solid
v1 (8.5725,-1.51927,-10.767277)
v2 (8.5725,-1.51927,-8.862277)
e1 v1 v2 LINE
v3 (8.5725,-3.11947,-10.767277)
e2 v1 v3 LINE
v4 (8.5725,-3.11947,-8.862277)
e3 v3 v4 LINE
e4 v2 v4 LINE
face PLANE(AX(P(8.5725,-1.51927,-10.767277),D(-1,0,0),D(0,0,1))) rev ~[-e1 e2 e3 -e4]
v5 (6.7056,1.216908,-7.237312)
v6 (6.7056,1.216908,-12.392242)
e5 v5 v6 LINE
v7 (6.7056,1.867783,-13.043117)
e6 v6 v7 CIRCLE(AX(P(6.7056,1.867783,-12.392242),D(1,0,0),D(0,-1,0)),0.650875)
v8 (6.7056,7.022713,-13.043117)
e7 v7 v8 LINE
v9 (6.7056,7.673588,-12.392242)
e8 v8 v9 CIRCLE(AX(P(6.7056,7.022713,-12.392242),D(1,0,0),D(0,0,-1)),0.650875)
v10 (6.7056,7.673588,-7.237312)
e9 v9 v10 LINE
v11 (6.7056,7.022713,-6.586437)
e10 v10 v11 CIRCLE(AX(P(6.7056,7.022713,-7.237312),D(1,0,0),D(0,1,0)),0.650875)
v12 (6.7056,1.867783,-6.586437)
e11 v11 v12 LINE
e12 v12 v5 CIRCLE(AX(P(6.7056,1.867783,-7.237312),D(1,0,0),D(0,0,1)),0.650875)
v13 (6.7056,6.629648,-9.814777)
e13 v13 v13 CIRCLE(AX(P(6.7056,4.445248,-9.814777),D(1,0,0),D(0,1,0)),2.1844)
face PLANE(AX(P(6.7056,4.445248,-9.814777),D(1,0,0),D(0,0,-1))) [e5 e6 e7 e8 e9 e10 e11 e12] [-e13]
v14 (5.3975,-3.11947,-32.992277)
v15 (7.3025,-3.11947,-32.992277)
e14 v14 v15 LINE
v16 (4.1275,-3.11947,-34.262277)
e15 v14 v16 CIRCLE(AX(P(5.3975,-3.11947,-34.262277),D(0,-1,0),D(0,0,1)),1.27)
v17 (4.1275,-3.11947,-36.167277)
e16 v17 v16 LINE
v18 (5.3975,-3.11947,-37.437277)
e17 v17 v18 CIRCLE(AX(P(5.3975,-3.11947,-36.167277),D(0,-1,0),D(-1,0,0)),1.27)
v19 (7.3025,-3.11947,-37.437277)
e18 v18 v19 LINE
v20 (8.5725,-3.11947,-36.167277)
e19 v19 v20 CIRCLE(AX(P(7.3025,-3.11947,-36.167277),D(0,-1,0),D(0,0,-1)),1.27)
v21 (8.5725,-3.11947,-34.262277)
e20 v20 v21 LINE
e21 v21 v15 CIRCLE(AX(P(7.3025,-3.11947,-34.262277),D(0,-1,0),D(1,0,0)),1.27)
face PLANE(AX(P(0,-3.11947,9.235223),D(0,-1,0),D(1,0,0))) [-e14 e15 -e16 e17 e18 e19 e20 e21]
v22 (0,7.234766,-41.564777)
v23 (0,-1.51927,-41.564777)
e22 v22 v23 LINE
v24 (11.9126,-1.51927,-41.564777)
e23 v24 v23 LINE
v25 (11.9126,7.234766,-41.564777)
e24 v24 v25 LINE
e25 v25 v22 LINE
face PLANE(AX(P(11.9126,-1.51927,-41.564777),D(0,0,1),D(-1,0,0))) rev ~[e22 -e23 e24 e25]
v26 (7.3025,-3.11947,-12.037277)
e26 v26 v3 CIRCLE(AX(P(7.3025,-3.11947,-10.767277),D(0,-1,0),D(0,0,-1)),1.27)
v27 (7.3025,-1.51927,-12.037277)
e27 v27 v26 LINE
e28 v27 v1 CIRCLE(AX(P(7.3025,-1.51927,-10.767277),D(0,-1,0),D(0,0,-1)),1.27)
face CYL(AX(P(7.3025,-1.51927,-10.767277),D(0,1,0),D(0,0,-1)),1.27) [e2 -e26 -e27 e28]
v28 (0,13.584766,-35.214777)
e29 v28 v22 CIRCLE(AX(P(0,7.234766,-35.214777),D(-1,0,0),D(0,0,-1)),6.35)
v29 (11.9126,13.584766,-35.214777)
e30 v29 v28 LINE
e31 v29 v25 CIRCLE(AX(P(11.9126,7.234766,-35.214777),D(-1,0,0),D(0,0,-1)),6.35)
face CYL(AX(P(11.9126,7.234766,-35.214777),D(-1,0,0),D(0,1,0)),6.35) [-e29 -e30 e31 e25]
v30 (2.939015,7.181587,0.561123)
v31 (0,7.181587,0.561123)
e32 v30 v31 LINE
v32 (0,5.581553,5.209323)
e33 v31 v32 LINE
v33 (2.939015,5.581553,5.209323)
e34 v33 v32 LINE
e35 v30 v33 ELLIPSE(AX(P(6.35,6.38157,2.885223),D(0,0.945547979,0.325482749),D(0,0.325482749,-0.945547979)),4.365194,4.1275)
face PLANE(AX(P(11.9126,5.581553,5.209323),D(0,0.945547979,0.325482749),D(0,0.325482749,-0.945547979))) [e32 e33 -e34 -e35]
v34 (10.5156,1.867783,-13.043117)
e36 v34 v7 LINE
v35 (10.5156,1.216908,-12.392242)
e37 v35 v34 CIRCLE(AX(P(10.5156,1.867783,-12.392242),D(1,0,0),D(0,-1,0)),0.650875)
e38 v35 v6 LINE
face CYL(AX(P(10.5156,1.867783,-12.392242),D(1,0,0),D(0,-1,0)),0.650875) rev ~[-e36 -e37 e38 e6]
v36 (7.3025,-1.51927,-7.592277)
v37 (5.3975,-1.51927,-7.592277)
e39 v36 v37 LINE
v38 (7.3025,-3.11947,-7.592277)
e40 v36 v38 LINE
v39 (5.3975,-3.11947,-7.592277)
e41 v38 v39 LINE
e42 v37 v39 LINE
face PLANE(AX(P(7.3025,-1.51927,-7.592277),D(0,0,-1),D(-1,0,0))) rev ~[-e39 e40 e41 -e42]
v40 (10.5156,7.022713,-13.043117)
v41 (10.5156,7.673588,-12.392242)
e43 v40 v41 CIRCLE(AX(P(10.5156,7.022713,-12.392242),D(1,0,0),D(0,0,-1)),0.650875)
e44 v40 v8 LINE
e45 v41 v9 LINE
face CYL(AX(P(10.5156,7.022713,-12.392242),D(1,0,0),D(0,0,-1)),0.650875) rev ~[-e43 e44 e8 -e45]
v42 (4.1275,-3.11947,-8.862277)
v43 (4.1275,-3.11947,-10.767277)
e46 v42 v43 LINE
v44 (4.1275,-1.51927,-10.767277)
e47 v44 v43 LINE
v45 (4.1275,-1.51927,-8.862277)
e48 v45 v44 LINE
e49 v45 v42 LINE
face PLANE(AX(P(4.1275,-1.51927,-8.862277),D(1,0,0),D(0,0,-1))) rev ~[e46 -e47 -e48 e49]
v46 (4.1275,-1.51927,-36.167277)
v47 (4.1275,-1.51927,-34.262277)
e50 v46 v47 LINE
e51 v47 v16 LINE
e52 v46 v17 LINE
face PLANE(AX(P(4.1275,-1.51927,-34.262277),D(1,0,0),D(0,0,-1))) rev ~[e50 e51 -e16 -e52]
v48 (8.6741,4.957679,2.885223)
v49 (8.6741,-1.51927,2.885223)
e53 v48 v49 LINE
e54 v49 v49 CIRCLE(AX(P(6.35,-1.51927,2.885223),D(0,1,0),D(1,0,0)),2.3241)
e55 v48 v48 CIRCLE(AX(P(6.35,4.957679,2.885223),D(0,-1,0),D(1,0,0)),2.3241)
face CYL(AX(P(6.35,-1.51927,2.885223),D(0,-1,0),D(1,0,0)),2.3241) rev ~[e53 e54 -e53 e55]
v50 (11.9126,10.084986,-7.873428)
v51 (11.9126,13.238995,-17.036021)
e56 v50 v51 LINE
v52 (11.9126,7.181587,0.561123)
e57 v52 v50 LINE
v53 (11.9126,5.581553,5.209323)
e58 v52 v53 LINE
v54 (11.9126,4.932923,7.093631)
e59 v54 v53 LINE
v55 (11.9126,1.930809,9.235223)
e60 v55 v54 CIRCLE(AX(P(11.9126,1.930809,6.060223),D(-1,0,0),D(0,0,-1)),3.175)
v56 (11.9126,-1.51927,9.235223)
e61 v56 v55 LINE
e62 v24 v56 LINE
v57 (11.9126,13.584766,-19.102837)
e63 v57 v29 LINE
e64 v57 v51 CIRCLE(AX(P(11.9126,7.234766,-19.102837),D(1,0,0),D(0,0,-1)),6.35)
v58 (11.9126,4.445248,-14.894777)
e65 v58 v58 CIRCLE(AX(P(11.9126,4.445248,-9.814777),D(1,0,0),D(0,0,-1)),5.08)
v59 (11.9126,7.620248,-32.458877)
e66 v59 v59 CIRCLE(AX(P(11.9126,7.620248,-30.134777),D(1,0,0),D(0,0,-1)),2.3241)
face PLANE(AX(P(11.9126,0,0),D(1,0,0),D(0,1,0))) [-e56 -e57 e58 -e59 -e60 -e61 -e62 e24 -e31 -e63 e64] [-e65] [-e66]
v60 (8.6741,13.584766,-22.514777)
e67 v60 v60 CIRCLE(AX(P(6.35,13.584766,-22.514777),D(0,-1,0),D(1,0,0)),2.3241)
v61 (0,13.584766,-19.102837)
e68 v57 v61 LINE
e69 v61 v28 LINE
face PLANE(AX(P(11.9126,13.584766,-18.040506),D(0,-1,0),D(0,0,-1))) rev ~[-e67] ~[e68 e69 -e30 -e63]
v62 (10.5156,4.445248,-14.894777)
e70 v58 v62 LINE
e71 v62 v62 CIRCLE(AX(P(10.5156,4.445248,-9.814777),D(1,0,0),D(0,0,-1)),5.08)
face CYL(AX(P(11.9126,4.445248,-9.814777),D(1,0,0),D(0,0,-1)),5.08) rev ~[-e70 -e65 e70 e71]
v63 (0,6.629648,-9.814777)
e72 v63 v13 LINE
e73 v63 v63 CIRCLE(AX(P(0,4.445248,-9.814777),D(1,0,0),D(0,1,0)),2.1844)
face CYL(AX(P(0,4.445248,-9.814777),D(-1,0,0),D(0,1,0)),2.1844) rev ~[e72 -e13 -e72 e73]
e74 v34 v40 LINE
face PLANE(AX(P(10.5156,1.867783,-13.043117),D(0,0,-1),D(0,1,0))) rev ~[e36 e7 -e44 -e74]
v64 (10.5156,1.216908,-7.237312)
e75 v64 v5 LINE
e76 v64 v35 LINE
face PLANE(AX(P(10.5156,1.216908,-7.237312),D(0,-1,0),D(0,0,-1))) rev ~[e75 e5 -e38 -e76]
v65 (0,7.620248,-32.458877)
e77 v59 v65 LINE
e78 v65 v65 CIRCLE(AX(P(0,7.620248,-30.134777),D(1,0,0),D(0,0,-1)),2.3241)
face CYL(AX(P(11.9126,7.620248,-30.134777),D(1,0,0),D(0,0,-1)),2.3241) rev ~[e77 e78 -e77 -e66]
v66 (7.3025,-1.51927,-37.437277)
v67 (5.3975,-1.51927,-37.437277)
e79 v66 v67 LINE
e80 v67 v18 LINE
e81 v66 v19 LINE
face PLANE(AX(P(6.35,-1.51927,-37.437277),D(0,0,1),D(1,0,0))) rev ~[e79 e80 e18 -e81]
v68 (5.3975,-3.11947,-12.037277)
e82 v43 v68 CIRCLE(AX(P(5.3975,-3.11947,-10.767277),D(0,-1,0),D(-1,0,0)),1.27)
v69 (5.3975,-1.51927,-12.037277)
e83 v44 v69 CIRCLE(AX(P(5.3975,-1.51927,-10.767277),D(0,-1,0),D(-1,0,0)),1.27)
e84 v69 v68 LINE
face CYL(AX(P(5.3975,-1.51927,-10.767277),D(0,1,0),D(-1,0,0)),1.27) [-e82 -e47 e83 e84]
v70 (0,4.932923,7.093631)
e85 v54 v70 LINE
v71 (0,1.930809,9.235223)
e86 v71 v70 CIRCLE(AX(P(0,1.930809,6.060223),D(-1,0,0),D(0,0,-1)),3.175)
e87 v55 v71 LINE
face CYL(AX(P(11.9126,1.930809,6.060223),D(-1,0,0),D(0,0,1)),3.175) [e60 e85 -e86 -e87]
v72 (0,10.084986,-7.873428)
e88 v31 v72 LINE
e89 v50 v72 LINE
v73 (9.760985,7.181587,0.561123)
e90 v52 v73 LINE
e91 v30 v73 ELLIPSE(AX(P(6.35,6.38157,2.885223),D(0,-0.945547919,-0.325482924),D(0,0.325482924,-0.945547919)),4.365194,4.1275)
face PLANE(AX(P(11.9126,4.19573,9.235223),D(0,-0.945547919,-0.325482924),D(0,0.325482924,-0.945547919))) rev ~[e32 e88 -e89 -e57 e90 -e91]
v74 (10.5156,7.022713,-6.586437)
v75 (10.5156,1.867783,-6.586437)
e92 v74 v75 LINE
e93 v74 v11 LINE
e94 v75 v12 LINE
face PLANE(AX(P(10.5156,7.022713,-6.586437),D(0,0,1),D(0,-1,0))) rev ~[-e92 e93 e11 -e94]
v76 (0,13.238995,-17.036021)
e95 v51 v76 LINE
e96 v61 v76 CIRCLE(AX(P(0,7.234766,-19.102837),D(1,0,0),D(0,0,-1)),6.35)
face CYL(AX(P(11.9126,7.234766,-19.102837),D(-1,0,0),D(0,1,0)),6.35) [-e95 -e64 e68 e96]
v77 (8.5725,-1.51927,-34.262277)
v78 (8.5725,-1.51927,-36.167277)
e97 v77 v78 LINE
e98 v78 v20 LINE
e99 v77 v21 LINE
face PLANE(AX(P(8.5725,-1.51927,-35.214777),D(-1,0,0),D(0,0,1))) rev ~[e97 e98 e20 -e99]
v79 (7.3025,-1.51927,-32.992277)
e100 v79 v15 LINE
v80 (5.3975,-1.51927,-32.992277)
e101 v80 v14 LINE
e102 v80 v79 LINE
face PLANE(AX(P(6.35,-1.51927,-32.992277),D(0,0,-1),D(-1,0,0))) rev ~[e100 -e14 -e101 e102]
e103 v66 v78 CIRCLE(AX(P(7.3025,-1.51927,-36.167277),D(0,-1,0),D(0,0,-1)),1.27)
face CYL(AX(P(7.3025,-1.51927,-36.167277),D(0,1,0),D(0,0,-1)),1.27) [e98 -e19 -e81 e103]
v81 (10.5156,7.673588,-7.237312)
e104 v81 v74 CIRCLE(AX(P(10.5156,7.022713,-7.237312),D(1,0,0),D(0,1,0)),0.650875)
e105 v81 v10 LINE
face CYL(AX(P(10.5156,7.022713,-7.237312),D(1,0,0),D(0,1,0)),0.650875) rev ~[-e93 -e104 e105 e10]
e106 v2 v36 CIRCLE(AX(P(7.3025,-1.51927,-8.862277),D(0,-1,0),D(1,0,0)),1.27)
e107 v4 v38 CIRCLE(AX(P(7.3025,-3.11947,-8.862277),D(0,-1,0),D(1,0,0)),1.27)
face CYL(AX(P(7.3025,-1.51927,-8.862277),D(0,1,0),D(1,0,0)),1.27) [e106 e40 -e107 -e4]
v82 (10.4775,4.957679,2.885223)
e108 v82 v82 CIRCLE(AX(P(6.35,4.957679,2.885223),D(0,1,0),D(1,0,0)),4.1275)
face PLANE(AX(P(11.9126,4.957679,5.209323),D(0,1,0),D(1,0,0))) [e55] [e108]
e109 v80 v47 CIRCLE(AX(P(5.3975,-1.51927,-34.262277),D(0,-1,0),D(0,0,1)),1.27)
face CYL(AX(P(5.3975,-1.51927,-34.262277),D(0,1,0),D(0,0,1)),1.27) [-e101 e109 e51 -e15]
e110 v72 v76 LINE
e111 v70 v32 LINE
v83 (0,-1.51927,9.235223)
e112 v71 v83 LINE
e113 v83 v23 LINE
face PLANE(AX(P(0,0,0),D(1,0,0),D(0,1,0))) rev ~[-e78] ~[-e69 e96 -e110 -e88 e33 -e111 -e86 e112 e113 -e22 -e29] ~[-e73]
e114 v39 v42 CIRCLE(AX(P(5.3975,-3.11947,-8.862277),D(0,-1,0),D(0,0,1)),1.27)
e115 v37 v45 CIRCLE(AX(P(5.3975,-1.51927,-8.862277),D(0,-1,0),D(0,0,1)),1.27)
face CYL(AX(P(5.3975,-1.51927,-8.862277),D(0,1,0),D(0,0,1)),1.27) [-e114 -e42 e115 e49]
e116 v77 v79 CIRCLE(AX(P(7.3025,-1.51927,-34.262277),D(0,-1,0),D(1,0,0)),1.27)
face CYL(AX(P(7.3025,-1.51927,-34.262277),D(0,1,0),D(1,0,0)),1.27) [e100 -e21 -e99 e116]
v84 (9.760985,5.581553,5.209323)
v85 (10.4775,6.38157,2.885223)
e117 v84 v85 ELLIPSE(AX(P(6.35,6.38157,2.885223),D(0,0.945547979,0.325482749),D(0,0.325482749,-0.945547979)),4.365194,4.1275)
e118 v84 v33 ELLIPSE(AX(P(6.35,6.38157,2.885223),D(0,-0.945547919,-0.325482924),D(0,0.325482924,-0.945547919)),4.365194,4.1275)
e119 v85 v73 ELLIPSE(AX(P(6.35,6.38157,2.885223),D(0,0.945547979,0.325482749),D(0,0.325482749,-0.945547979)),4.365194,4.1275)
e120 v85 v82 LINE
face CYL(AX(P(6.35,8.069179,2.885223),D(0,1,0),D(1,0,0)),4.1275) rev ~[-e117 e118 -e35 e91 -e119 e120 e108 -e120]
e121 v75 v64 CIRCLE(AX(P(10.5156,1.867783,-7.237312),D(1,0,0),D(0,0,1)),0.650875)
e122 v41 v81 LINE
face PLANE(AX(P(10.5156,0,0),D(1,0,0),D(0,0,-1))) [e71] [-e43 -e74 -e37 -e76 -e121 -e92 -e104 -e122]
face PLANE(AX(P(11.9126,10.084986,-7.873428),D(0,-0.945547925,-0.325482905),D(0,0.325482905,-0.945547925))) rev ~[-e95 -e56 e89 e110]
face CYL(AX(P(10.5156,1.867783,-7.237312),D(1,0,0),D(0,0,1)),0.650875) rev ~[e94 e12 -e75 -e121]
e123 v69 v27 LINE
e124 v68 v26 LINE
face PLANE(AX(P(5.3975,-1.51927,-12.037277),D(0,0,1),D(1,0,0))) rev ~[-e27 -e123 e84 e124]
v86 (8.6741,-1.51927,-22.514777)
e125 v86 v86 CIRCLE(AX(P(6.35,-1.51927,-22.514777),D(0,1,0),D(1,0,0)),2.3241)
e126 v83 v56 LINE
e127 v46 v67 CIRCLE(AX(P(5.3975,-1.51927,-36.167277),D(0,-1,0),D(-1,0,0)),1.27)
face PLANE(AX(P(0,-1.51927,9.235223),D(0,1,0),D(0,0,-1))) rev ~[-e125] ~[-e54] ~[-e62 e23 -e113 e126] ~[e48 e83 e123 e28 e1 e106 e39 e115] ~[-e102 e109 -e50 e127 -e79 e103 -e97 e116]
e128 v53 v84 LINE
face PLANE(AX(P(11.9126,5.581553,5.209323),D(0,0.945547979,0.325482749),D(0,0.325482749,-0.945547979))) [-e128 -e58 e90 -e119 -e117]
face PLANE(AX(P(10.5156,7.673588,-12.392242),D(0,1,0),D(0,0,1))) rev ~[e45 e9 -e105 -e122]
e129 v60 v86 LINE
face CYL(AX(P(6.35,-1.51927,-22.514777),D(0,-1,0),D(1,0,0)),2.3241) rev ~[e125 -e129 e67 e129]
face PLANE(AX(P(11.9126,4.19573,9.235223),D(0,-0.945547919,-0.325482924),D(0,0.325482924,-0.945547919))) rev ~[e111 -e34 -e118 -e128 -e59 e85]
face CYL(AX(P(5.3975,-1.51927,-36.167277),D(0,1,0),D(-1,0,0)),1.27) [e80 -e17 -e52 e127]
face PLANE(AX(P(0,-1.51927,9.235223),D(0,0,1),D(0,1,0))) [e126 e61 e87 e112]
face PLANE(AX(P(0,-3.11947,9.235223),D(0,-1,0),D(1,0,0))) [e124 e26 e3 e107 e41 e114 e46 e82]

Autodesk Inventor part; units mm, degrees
ref_plane "YZ Plane" through (0, 0, 0) normal (1, 0, 0) x (0, 1, 0)
ref_plane "XZ Plane" through (0, 0, 0) normal (0, 1, 0) x (-1, 0, 0)
ref_plane "XY Plane" through (0, 0, 0) normal (0, 0, 1) x (1, 0, 0)
sketch "Sketch1" plane through (0, 0, 0) normal (1, 0, 0) x (0, 1, 0)
  line L0 (-1.51927, 9.235223) -> (-1.51927, -28.864777)
  circle A0 centre (4.445248, -9.814777) radius 2.1844
  circle A1 centre (4.445248, -9.814777) radius 5.964518
  line L1 (4.445248, -9.814777) -> (-1.51927, -9.814777)
  line L2 (-1.51927, -9.814777) -> (-1.51927, 9.235223)
  line L3 (-1.51927, 9.235223) -> (-1.51927, -28.864777)
  line L4 (-1.51927, 9.235223) -> (1.02073, 9.235223)
  line L5 (1.02073, 9.235223) -> (9.344761, -6.41327)
  line L6 (-1.51927, -28.864777) -> (1.02073, -28.864777)
  line L7 (1.02073, -28.864777) -> (9.344761, -13.216284)
  point P0 (0, 0)
  dimension "d0" = 5.96452
  dimension "d1" = 19.05
  dimension "d2" = 38.1
  dimension "d3" = 2.54
extrude "Extrusion1" add sketch "Sketch1" along normal blind 11.9126
sketch "Sketch2" plane through (0, -1.51927, -28.864777) normal (0, -1, 0) x (1, 0, 0)
  line L0 (0, 38.1) -> (0, 0) projected
  line L1 (0, 0) -> (11.9126, 0) projected
  line L2 (11.9126, 38.1) -> (11.9126, 0) projected
  line L3 (0, 38.1) -> (11.9126, 38.1) projected
  line L4 (0, 38.1) -> (6.35, 38.1)
  line L5 (6.35, 38.1) -> (6.35, 0)
  line L6 (6.35, 38.1) -> (6.35, 31.75)
  line L7 (6.35, 31.75) -> (6.35, 6.35)
  line L8 (6.35, 6.35) -> (6.35, 0)
  circle A0 centre (6.35, 31.75) radius 2.3241
  circle A1 centre (6.35, 6.35) radius 2.3241
  circle A2 centre (6.35, 19.05) radius 2.2225
  point P0 (0, 28.864777)
  dimension "d6" = 6.35
  dimension "d7" = 6.35
  dimension "d8" = 25.4
  dimension "d9" = 4.6482
  dimension "d10" = 4.445
extrude "Extrusion2" cut sketch "Sketch2" against normal through all contours A0 L5 | L5 A0 | A1 L5 | L5 A1
sketch "Sketch3" plane through (11.9126, 0, 0) normal (1, 0, 0) x (0, 0, -1)
  line L0 (28.864777, -1.51927) -> (28.864777, 1.02073)
  line L1 (28.864777, 1.02073) -> (13.216284, 9.344761)
  arc A0 (13.216284, 9.344761) -> (6.41327, 9.344761) centre (9.814777, 4.445248) ccw
  line L2 (6.41327, 9.344761) -> (-9.235223, 1.02073)
  line L3 (-9.235223, 1.02073) -> (-9.235223, -1.51927)
  line L4 (-9.235223, -1.51927) -> (28.864777, -1.51927)
  circle A1 centre (9.814777, 4.445248) radius 2.1844
  line L5 (9.814777, 10.409766) -> (28.864777, 10.409766)
  line L6 (28.864777, 10.409766) -> (28.864777, -1.51927)
  line L7 (20.190677, 5.634815) -> (24.838877, 3.16226)
  line L8 (24.838877, -1.51927) -> (20.190677, -1.51927)
  line L9 (22.514777, -1.51927) -> (22.514777, 10.409766)
  line L10 (22.514777, 10.409766) -> (35.214777, 10.409766)
  line L11 (35.214777, 10.409766) -> (35.214777, -1.51927)
  line L12 (35.214777, -1.51927) -> (28.864777, -1.51927)
  line L13 (-9.235223, 1.02073) -> (-9.235223, 4.19573)
  line L14 (-9.235223, 4.19573) -> (7.873428, 10.084986)
  point P0 (0, 0)
  dimension "d13" = 12.7
  dimension "d14" = 3.175
extrude "Extrusion3" add sketch "Sketch3" against normal up to surface (11.9126 mm away) contours L0 L6 L10 L11 L12 | L1 L9 L5 L6 | L1 A0 L5 L9 | A0 L2 L13 L14
sketch "Sketch4" plane through (0, -1.51927, 9.235223) normal (0, -1, 0) x (1, 0, 0)
  circle A0 centre (6.35, -31.75) radius 2.3241 projected
  circle A1 centre (6.35, -6.35) radius 2.3241 projected
  line L0 (0, 0) -> (0, -44.45) projected
  line L1 (11.9126, -44.45) -> (0, -44.45) projected
  line L2 (11.9126, 0) -> (11.9126, -44.45) projected
  line L3 (0, 0) -> (11.9126, 0) projected
  point P0 (0, -9.235223)
extrude "Extrusion4" cut sketch "Sketch4" against normal through all contours A0 | A1
sketch "Sketch6" plane through (0, -1.51927, 9.235223) normal (0, -1, 0) x (1, 0, 0)
  line L0 (11.9126, -16.8656) -> (0, -16.8656) projected
  circle A0 centre (6.35, -31.75) radius 2.3241 projected
  circle A1 centre (6.35, -6.35) radius 2.3241 projected
  line L1 (0, 0) -> (0, -44.45) projected
  line L2 (11.9126, -44.45) -> (0, -44.45) projected
  line L3 (11.9126, 0) -> (11.9126, -44.45) projected
  line L4 (0, 0) -> (11.9126, 0) projected
  line L5 (6.35, -6.35) -> (6.35, -19.05)
  circle A2 centre (6.35, -19.05) radius 2.2225
  line L6 (7.3025, -16.8275) -> (5.3975, -16.8275)
  line L7 (4.1275, -18.0975) -> (4.1275, -20.0025)
  line L8 (5.3975, -21.2725) -> (7.3025, -21.2725)
  line L9 (8.5725, -20.0025) -> (8.5725, -18.0975)
  arc A3 (8.5725, -18.0975) -> (7.3025, -16.8275) centre (7.3025, -18.0975) ccw
  arc A4 (7.3025, -21.2725) -> (8.5725, -20.0025) centre (7.3025, -20.0025) ccw
  arc A5 (5.3975, -16.8275) -> (4.1275, -18.0975) centre (5.3975, -18.0975) ccw
  arc A6 (4.1275, -20.0025) -> (5.3975, -21.2725) centre (5.3975, -20.0025) ccw
  point P0 (0, -9.235223)
  dimension "d20" = 12.7
  dimension "d21" = 4.445
  dimension "d22" = 1.27
sketch "Sketch6 outline for Extrusion5" plane through (0, -1.51927, 9.235223) normal (0, -1, 0) x (1, 0, 0)
  arc A0 (4.1275, -20.0025) -> (5.3975, -21.2725) centre (5.3975, -20.0025) ccw
  line L0 (4.1275, -18.0975) -> (4.1275, -20.0025)
  arc A1 (5.3975, -16.8275) -> (4.1275, -18.0975) centre (5.3975, -18.0975) ccw
  line L1 (7.3025, -16.8275) -> (5.3975, -16.8275)
  arc A2 (8.5725, -18.0975) -> (7.3025, -16.8275) centre (7.3025, -18.0975) ccw
  line L2 (8.5725, -20.0025) -> (8.5725, -18.0975)
  arc A3 (7.3025, -21.2725) -> (8.5725, -20.0025) centre (7.3025, -20.0025) ccw
  line L3 (5.3975, -21.2725) -> (7.3025, -21.2725)
extrude "Extrusion5" add sketch "Sketch6 outline for Extrusion5" along normal blind 1.6002
sketch "Sketch7" plane through (0, -1.51927, 9.235223) normal (0, -1, 0) x (1, 0, 0)
  arc A0 (4.1275, -20.0025) -> (5.3975, -21.2725) centre (5.3975, -20.0025) ccw projected
  line L0 (4.1275, -20.0025) -> (4.1275, -18.0975) projected
  arc A1 (5.3975, -16.8275) -> (4.1275, -18.0975) centre (5.3975, -18.0975) ccw projected
  line L1 (5.3975, -16.8275) -> (7.3025, -16.8275) projected
  arc A2 (8.5725, -18.0975) -> (7.3025, -16.8275) centre (7.3025, -18.0975) ccw projected
  line L2 (8.5725, -18.0975) -> (8.5725, -20.0025) projected
  arc A3 (7.3025, -21.2725) -> (8.5725, -20.0025) centre (7.3025, -20.0025) ccw projected
  line L3 (7.3025, -21.2725) -> (5.3975, -21.2725) projected
  circle A4 centre (6.35, -31.75) radius 2.3241 projected
  circle A5 centre (6.35, -6.35) radius 2.3241 projected
  line L4 (0, 0) -> (0, -44.45) projected
  line L5 (11.9126, -44.45) -> (0, -44.45) projected
  line L6 (11.9126, 0) -> (11.9126, -44.45) projected
  line L7 (0, 0) -> (11.9126, 0) projected
  line L8 (11.9126, -44.45) -> (11.9126, -50.8)
  line L9 (11.9126, 0) -> (11.9126, -44.45) projected
  line L10 (11.9126, -50.8) -> (0, -50.8)
  line L11 (0, -50.8) -> (0, -44.45)
  line L12 (6.35, -31.75) -> (6.35, -44.45)
  circle A6 centre (6.35, -44.45) radius 2.2225
  line L13 (7.3025, -42.2275) -> (5.3975, -42.2275)
  line L14 (4.1275, -43.4975) -> (4.1275, -45.4025)
  line L15 (5.3975, -46.6725) -> (7.3025, -46.6725)
  line L16 (8.5725, -45.4025) -> (8.5725, -43.4975)
  arc A7 (8.5725, -43.4975) -> (7.3025, -42.2275) centre (7.3025, -43.4975) ccw
  arc A8 (7.3025, -46.6725) -> (8.5725, -45.4025) centre (7.3025, -45.4025) ccw
  arc A9 (4.1275, -45.4025) -> (5.3975, -46.6725) centre (5.3975, -45.4025) ccw
  arc A10 (5.3975, -42.2275) -> (4.1275, -43.4975) centre (5.3975, -43.4975) ccw
  point P0 (0, -9.235223)
  dimension "d25" = 6.35
  dimension "d26" = 12.7
  dimension "d27" = 4.445
  dimension "d28" = 1.27
extrude "Extrusion6" add sketch "Sketch7" against normal up to surface (11.929036 mm away) contours L5 L14 A9 L15 A8 L16 L8 L10 L11 | L5 A6 | A6 L15 A9 L14 | A6 L16 A8 L15
extrude "Extrusion7" add sketch "Sketch7" along normal blind 1.6002 contours A6 L12 L5 | L14 A10 L13 A6 | L5 A6 | A6 L15 A9 L14 | L12 A6 L5 | L13 A7 L16 A6 | A6 L16 A8 L15
sketch "Sketch8" plane through (11.9126, 0, 0) normal (1, 0, 0) x (0, 0, -1)
  line L0 (24.838877, -1.51927) -> (24.838877, 10.409766)
  arc A0 (9.814777, 10.409766) -> (7.873428, 10.084986) centre (9.814777, 4.445248) ccw
  line L1 (7.873428, 10.084986) -> (-9.235223, 4.19573)
  line L2 (-9.235223, 4.19573) -> (-9.235223, -1.51927)
  line L3 (-9.235223, -1.51927) -> (41.564777, -1.51927)
  line L4 (41.564777, -1.51927) -> (41.564777, 10.409766)
  line L5 (41.564777, 10.409766) -> (9.814777, 10.409766)
  circle A1 centre (9.814777, 4.445248) radius 2.1844
  line L6 (-9.235223, 4.19573) -> (18.040506, 13.584766)
  line L7 (14.316656, 13.584766) -> (41.564777, 13.584766)
  line L8 (41.564777, 13.584766) -> (41.564777, 10.409766)
  point P0 (0, 0)
  point P1 (7.873428, 10.084986)
extrude "Extrusion8" add sketch "Sketch8" against normal up to surface (11.9126 mm away) contours L5 A0 L6 L7 L8
sketch "Sketch9" plane through (11.9126, 0, 0) normal (1, 0, 0) x (0, 0, -1)
  line L0 (18.040506, 13.584766) -> (-9.235223, 4.19573)
  line L1 (-9.235223, 4.19573) -> (-9.235223, -1.51927)
  line L2 (-9.235223, -1.51927) -> (41.564777, -1.51927)
  line L3 (41.564777, -1.51927) -> (41.564777, 13.584766)
  line L4 (41.564777, 13.584766) -> (18.040506, 13.584766)
  circle A0 centre (9.814777, 4.445248) radius 2.1844
  line L5 (9.814777, 4.445248) -> (35.214777, 4.445248)
  line L6 (35.214777, 4.445248) -> (35.214777, 7.620248)
  circle A1 centre (35.214777, 7.620248) radius 2.3241
  circle A2 centre (35.214777, 7.620248) radius 5.08
  line L7 (35.214777, 7.620248) -> (30.134777, 7.620248)
  circle A3 centre (30.134777, 7.620248) radius 2.3241
  point P0 (0, 0)
  dimension "d36" = 25.4
  dimension "d37" = 3.175
  dimension "d38" = 4.6482
  dimension "d49" = 10.16
  dimension "d57" = 5.08
  dimension "d58" = 4.6482
fillet "Fillet1" radius 3.175 1 edges at (5.9563, 4.1957, 9.2352)
sketch "Sketch10" plane through (11.9126, 0, 0) normal (1, 0, 0) x (0, 0, -1)
  line L0 (-5.209323, 5.581553) -> (-0.561123, 7.181587)
  line L1 (-0.561123, -1.51927) -> (-5.209323, -1.51927)
  line L2 (-2.885223, 6.38157) -> (-0.561123, 6.38157)
  line L3 (-0.561123, -1.51927) -> (-0.561123, 7.181587)
  line L4 (-0.561123, 6.38157) -> (-5.209323, 6.38157)
  line L5 (-5.209323, -1.51927) -> (-5.209323, 5.581553)
  line L6 (-0.561123, 6.38157) -> (-0.561123, 8.069179)
  line L7 (-0.561123, 8.069179) -> (-5.209323, 8.069179)
  line L8 (-5.209323, 8.069179) -> (-5.209323, 5.581553)
  point P0 (0, 0)
extrude "Extrusion9" add sketch "Sketch10" against normal up to surface (11.9126 mm away) contours L8 L4 L0 | L4 L8 L7 L6 L0
sketch "Sketch11" plane through (11.9126, 8.069179, 5.209323) normal (0, 1, 0) x (1, 0, 0)
  arc A0 (-5.5626, 4.6482) -> (-5.5626, 0) centre (-5.5626, 2.3241) ccw projected
  arc A1 (-5.5626, 0) -> (-5.5626, 4.6482) centre (-5.5626, 2.3241) ccw projected
  circle A2 centre (-5.5626, 2.3241) radius 2.3241 projected
  arc A3 (-5.5626, 4.6482) -> (-5.5626, 0) centre (-5.5626, 2.3241) ccw projected
  circle A4 centre (-5.5626, 2.3241) radius 4.1275
  point P0 (-11.9126, 5.209323)
  dimension "d42" = 8.255
extrude "Extrusion10" cut sketch "Sketch11" against normal blind 3.1115 contours A1 A0 | A4
sketch "Sketch12" plane through (11.9126, 0, 0) normal (1, 0, 0) x (0, 0, -1)
  circle A0 centre (9.814777, 4.445248) radius 2.1844
  arc A1 (-7.093632, 4.932923) -> (-9.235223, 1.930809) centre (-6.060223, 1.930809) ccw
  line L0 (-9.235223, 1.930809) -> (-9.235223, -1.51927)
  line L1 (-9.235223, -1.51927) -> (41.564777, -1.51927)
  line L2 (41.564777, -1.51927) -> (41.564777, 13.584766)
  line L3 (41.564777, 13.584766) -> (18.040506, 13.584766)
  line L4 (18.040506, 13.584766) -> (-0.561123, 7.181587)
  line L5 (-0.561123, 7.181587) -> (-0.561123, 8.069179)
  line L6 (-0.561123, 8.069179) -> (-5.209323, 8.069179)
  line L7 (-5.209323, 8.069179) -> (-5.209323, 5.581553)
  line L8 (-5.209323, 5.581553) -> (-7.093632, 4.932923)
  line L9 (-5.209323, 5.581553) -> (-0.561123, 7.181587)
  point P0 (0, 0)
extrude "Extrusion11" cut sketch "Sketch12" along normal through all both and the other way through all contours L7 L6 L5 L9
sketch "Sketch13" plane through (0, -1.51927, 9.235223) normal (0, -1, 0) x (1, 0, 0)
  circle A0 centre (6.35, -6.35) radius 4.1275 projected
  arc A1 (5.3975, -42.2275) -> (4.1275, -43.4975) centre (5.3975, -43.4975) ccw projected
  line L0 (5.3975, -42.2275) -> (7.3025, -42.2275) projected
  arc A2 (8.5725, -43.4975) -> (7.3025, -42.2275) centre (7.3025, -43.4975) ccw projected
  line L1 (8.5725, -43.4975) -> (8.5725, -45.4025) projected
  arc A3 (7.3025, -46.6725) -> (8.5725, -45.4025) centre (7.3025, -45.4025) ccw projected
  line L2 (7.3025, -46.6725) -> (5.3975, -46.6725) projected
  arc A4 (4.1275, -45.4025) -> (5.3975, -46.6725) centre (5.3975, -45.4025) ccw projected
  line L3 (4.1275, -45.4025) -> (4.1275, -43.4975) projected
  arc A5 (4.1275, -20.0025) -> (5.3975, -21.2725) centre (5.3975, -20.0025) ccw projected
  line L4 (4.1275, -20.0025) -> (4.1275, -18.0975) projected
  arc A6 (5.3975, -16.8275) -> (4.1275, -18.0975) centre (5.3975, -18.0975) ccw projected
  line L5 (5.3975, -16.8275) -> (7.3025, -16.8275) projected
  arc A7 (8.5725, -18.0975) -> (7.3025, -16.8275) centre (7.3025, -18.0975) ccw projected
  line L6 (8.5725, -18.0975) -> (8.5725, -20.0025) projected
  arc A8 (7.3025, -21.2725) -> (8.5725, -20.0025) centre (7.3025, -20.0025) ccw projected
  line L7 (7.3025, -21.2725) -> (5.3975, -21.2725) projected
  circle A9 centre (6.35, -31.75) radius 2.3241 projected
  circle A10 centre (6.35, -6.35) radius 2.3241 projected
  line L8 (0, 0) -> (0, -50.8) projected
  line L9 (0, -50.8) -> (11.9126, -50.8) projected
  line L10 (11.9126, 0) -> (11.9126, -50.8) projected
  line L11 (0, 0) -> (11.9126, 0) projected
  point P0 (0, -9.235223)
extrude "Extrusion12" cut sketch "Sketch13" along normal through all both and the other way through all contours A9
extrude "Extrusion13" [suppressed]
sketch "Sketch14" plane through (11.9126, 0, 0) normal (1, 0, 0) x (0, 0, -1)
  line L0 (18.040506, 13.584766) -> (-7.093632, 4.932923)
  arc A0 (-7.093632, 4.932923) -> (-9.235223, 1.930809) centre (-6.060223, 1.930809) ccw
  line L1 (-9.235223, 1.930809) -> (-9.235223, -1.51927)
  line L2 (-9.235223, -1.51927) -> (41.564777, -1.51927)
  line L3 (41.564777, -1.51927) -> (41.564777, 13.584766)
  line L4 (41.564777, 13.584766) -> (18.040506, 13.584766)
  circle A1 centre (9.814777, 4.445248) radius 2.1844
  circle A2 centre (9.814777, 4.445248) radius 5.08
  point P0 (0, 0)
  dimension "d52" = 10.16
extrude "Extrusion14" cut sketch "Sketch14" against normal blind 1.397 contours A2
sketch "Sketch15" plane through (10.5156, 4.445248, -9.814777) normal (1, 0, 0) x (0, 0, -1)
  line L0 (-3.22834, 2.577465) -> (-3.22834, -2.577465)
  circle A0 centre (0, 0) radius 2.032
  line L1 (-2.577465, -3.22834) -> (2.577465, -3.22834)
  arc A1 (-3.22834, -2.577465) -> (-2.577465, -3.22834) centre (-2.577465, -2.577465) ccw
  arc A2 (-2.577465, 3.22834) -> (-3.22834, 2.577465) centre (-2.577465, 2.577465) ccw
  line L2 (2.577465, 3.22834) -> (-2.577465, 3.22834)
  arc A3 (3.22834, 2.577465) -> (2.577465, 3.22834) centre (2.577465, 2.577465) ccw
  line L3 (3.22834, -2.577465) -> (3.22834, 2.577465)
  arc A4 (2.577465, -3.22834) -> (3.22834, -2.577465) centre (2.577465, -2.577465) ccw
  circle A5 centre (0, 0) radius 5.08
  circle A6 centre (0, 0) radius 2.1844
  point P0 (-9.814777, -4.445248)
extrude "Extrusion15" cut sketch "Sketch15" against normal blind 3.81 contours A2 L2 A3 L3 A4 L1 A1 L0
extrude "Extrusion16" cut sketch "Sketch9" along normal through all both and the other way through all contours A3 A2 | A2 L7 A3 | A2 A3 L7
fillet "Fillet2" radius 6.35 1 edges at (5.9563, 13.5848, -18.0405)
fillet "Fillet3" radius 6.35 1 edges at (5.9563, 13.5848, -41.5648)
properties part number "Pass_Hang_Block"
